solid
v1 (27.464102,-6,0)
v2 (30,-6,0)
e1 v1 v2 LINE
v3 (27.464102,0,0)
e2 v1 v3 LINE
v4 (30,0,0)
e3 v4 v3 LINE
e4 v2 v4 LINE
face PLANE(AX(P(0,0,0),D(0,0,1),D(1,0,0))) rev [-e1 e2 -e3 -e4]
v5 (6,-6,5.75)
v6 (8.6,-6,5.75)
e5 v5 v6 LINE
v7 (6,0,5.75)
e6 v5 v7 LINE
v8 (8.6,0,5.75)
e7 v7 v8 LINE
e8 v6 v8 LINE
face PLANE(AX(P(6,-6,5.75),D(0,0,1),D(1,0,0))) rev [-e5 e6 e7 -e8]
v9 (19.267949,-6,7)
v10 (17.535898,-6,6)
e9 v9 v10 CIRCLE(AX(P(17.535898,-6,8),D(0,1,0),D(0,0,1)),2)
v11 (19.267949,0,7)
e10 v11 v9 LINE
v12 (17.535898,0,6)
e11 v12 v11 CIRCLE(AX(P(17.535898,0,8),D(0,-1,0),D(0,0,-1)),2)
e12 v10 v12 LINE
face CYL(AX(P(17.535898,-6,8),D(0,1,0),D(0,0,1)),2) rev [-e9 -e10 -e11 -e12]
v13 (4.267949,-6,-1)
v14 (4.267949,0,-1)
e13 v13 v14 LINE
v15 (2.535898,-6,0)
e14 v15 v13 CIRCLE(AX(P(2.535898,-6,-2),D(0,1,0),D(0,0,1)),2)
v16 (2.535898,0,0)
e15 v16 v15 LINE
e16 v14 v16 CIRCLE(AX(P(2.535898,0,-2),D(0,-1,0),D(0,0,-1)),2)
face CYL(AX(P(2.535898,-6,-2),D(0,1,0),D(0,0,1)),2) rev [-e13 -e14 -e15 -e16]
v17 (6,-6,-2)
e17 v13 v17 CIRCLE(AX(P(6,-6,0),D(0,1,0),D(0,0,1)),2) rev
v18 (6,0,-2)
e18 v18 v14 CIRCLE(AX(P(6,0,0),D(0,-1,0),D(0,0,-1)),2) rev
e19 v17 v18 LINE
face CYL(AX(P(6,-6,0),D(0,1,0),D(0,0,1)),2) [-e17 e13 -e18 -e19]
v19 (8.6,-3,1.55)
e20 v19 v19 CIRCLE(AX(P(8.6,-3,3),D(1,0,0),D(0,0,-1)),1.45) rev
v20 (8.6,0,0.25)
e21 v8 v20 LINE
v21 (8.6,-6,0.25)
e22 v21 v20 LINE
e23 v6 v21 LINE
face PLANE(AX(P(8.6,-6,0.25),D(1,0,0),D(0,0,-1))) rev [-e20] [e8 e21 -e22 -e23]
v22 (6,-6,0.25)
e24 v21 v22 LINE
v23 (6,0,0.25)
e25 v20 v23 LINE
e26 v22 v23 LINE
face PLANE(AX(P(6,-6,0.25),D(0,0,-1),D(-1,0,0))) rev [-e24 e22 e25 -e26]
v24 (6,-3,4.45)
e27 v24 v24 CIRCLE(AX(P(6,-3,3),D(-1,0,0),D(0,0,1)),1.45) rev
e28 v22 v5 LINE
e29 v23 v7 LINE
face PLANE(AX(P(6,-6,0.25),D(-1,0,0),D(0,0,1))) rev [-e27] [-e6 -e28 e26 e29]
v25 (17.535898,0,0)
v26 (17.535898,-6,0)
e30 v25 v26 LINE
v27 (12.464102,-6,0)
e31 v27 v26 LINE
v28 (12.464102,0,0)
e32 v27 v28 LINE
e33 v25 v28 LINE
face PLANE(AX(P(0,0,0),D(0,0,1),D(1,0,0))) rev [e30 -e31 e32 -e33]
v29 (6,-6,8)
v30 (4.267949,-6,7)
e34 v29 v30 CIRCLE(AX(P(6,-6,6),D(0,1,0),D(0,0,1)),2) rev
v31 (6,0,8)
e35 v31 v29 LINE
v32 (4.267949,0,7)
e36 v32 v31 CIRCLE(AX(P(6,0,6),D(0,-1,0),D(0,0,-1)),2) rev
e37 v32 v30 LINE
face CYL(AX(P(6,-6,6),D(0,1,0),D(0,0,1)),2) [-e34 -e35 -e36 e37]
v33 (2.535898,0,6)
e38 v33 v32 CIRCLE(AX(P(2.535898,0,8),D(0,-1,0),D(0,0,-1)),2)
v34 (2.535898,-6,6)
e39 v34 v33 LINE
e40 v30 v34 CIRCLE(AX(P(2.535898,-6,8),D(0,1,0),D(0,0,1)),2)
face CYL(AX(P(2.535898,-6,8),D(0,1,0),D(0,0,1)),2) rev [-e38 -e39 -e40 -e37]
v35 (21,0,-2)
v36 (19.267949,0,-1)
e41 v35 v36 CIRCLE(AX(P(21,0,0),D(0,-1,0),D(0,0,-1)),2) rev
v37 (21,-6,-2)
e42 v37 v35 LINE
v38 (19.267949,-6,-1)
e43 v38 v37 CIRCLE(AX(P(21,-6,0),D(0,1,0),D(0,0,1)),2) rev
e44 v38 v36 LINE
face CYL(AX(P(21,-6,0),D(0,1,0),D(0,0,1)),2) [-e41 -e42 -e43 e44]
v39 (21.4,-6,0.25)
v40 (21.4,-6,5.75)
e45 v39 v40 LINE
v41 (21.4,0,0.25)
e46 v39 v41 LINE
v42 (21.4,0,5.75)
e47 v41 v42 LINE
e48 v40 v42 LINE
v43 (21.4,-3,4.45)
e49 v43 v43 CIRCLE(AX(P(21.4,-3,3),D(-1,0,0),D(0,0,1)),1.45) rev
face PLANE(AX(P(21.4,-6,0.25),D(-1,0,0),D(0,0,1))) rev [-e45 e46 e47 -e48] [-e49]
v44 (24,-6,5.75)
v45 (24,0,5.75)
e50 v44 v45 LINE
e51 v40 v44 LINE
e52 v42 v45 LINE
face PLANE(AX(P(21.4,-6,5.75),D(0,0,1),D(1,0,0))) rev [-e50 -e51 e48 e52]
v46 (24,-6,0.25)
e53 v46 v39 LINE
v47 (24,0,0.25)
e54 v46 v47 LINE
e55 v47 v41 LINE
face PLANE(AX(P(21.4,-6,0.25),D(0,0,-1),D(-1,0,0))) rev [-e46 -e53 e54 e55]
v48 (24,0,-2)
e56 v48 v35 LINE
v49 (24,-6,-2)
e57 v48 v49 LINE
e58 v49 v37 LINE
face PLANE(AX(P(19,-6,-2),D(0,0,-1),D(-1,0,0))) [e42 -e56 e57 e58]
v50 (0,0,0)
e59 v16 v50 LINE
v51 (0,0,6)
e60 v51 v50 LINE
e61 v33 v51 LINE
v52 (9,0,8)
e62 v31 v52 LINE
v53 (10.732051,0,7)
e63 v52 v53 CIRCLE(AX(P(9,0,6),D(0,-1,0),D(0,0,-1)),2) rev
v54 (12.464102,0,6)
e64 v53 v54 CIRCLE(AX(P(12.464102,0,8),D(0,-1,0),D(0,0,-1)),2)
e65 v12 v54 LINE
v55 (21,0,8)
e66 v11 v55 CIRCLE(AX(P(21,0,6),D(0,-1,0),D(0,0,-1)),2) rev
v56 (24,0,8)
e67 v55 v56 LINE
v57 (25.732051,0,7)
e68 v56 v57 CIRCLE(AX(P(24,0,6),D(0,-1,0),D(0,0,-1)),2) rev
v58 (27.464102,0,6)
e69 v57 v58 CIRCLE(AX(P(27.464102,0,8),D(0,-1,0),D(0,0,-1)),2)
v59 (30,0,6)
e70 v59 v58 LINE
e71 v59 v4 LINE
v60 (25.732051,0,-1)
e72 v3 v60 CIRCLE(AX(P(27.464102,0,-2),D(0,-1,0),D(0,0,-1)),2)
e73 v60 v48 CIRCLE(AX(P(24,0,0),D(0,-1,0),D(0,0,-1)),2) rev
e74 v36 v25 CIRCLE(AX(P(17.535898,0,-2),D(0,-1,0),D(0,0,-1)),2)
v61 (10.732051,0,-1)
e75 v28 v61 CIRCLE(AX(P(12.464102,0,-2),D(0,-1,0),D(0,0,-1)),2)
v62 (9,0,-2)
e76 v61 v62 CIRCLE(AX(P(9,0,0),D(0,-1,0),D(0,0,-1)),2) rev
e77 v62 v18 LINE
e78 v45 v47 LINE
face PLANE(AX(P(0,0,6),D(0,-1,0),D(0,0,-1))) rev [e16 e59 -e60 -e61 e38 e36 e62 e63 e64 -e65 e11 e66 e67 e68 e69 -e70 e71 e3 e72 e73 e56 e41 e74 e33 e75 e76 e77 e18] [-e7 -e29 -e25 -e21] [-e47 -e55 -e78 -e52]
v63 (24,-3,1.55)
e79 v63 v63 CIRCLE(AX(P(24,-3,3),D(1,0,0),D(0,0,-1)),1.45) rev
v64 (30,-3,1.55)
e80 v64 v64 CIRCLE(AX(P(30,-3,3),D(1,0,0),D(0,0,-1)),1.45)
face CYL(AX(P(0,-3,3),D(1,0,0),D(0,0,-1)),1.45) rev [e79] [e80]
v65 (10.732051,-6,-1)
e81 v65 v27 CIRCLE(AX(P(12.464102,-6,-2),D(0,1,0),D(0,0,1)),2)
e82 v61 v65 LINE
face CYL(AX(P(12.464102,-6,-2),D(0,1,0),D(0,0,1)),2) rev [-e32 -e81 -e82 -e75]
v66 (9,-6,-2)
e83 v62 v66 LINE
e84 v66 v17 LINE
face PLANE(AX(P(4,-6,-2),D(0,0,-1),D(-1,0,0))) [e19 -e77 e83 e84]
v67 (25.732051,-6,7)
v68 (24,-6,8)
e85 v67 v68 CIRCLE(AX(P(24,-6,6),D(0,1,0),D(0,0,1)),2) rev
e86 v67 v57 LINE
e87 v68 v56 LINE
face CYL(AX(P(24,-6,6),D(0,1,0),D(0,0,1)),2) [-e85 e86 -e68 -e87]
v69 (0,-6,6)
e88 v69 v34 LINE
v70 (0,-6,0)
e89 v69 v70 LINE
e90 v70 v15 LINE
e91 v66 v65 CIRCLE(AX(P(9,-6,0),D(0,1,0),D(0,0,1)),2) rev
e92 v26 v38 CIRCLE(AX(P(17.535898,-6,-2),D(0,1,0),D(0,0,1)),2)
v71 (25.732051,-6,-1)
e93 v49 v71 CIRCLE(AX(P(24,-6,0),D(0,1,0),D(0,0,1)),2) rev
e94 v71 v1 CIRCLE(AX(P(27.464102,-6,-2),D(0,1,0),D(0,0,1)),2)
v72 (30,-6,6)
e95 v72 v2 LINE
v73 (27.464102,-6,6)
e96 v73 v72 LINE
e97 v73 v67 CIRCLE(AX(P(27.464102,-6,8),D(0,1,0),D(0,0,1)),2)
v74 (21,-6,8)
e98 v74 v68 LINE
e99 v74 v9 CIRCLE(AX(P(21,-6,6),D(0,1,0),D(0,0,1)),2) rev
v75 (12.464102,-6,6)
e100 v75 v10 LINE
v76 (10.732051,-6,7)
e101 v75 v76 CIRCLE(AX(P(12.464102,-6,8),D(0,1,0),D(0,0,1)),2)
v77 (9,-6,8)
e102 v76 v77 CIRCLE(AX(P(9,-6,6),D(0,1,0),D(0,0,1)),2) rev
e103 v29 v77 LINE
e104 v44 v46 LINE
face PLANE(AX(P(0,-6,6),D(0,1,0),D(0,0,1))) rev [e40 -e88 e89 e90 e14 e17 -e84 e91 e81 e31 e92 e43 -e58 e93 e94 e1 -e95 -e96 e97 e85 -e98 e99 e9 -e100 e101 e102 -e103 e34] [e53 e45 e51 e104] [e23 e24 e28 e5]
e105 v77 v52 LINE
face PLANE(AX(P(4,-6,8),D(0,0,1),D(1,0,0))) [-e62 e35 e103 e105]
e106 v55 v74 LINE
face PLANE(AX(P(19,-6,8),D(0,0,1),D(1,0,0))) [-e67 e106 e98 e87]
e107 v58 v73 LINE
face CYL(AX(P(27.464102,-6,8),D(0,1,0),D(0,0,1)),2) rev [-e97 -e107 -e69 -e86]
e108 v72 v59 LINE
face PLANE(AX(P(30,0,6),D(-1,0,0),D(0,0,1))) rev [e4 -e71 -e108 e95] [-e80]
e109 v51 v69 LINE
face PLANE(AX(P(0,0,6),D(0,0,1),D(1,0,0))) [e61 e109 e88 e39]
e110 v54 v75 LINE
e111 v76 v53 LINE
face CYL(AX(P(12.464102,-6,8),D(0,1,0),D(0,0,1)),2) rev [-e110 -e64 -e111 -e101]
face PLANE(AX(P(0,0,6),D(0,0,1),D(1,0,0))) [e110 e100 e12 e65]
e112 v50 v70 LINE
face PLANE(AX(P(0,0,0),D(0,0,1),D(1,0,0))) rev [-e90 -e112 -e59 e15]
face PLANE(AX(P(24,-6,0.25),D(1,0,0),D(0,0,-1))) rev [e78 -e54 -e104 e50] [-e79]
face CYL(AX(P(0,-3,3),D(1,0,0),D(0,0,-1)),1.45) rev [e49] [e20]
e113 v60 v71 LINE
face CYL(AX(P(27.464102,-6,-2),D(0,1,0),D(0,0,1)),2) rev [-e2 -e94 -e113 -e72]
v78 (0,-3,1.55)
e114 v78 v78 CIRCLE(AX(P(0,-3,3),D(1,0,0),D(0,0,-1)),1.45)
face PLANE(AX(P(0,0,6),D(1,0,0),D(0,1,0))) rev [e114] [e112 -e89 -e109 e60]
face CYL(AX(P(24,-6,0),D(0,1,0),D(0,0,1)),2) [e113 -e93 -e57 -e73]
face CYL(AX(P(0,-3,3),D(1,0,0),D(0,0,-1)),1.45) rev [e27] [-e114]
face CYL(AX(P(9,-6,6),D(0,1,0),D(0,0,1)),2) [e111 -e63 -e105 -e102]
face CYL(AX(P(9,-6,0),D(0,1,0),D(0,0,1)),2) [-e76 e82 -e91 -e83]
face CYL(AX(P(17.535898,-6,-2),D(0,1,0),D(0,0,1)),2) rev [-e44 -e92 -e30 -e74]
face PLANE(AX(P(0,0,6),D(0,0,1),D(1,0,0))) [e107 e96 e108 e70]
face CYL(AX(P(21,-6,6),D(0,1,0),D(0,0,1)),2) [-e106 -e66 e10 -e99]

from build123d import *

# Parameters (mm, degrees)
SKETCH1_W           = 30
SKETCH1_H           = 6
BOSS_EXTRUDE1_DEPTH = 6
SKETCH2_R           = 1.45
CUT_EXTRUDE1_DEPTH  = 32.176914536
SKETCH3_W           = 2.6
SKETCH3_H           = 5.5
CUT_EXTRUDE2_DEPTH  = 32.176914536
SKETCH4_W           = 7
SKETCH4_H           = 2
BOSS_EXTRUDE2_DEPTH = 6
FILLET1_R           = 2
FILLET2_R           = 2


with BuildPart() as part:
    # Sketch1 → Boss-Extrude1 (new body)
    with BuildSketch(Plane.XY):
        with Locations((15, -3)):
            Rectangle(SKETCH1_W, SKETCH1_H)
    extrude(amount=BOSS_EXTRUDE1_DEPTH)

    # Sketch2 → Cut-Extrude1 (cut, through all)
    with BuildSketch(Plane(origin=(30, 0, 0), x_dir=(0, 0, -1), z_dir=(1, 0, 0))):
        with Locations((-3, -3)):
            Circle(SKETCH2_R)
    extrude(amount=-CUT_EXTRUDE1_DEPTH, mode=Mode.SUBTRACT)

    # Sketch3 → Cut-Extrude2 (cut, through all)
    with BuildSketch(Plane(origin=(0, 0, 0), x_dir=(1, 0, 0), z_dir=(0, 1, 0))):
        with Locations((7.3, -3)):
            Rectangle(SKETCH3_W, SKETCH3_H)
        with Locations((22.7, -3)):
            Rectangle(SKETCH3_W, SKETCH3_H)
    extrude(amount=-CUT_EXTRUDE2_DEPTH, mode=Mode.SUBTRACT)

    # Sketch4 → Boss-Extrude2 (add)
    with BuildSketch(Plane(origin=(0, 0, 0), x_dir=(1, 0, 0), z_dir=(0, 1, 0))):
        with Locations((7.5, -7)):
            Rectangle(SKETCH4_W, SKETCH4_H)
        with Locations((22.5, -7)):
            Rectangle(SKETCH4_W, SKETCH4_H)
        with Locations((7.5, 1)):
            Rectangle(SKETCH4_W, SKETCH4_H)
        with Locations((22.5, 1)):
            Rectangle(SKETCH4_W, SKETCH4_H)
    extrude(amount=-BOSS_EXTRUDE2_DEPTH)

    # Fillet1
    fillet1_edges = [part.edges().sort_by_distance(p)[0] for p in [
        (26, -3, -2),
        (4, -3, -2),
        (11, -3, -2),
        (19, -3, -2),
        (26, -3, 8),
        (19, -3, 8),
        (11, -3, 8),
        (4, -3, 8),
    ]]
    fillet(fillet1_edges, radius=FILLET1_R - 0.0001)  # a hair under: the kernel refuses the full size

    # Fillet2
    fillet2_edges = [part.edges().sort_by_distance(p)[0] for p in [
        (4, -3, 6),
        (11, -3, 6),
        (19, -3, 6),
        (26, -3, 6),
        (4, -3, 0),
        (11, -3, 0),
        (19, -3, 0),
        (26, -3, 0),
    ]]
    fillet(fillet2_edges, radius=FILLET2_R)


solid = part.part
